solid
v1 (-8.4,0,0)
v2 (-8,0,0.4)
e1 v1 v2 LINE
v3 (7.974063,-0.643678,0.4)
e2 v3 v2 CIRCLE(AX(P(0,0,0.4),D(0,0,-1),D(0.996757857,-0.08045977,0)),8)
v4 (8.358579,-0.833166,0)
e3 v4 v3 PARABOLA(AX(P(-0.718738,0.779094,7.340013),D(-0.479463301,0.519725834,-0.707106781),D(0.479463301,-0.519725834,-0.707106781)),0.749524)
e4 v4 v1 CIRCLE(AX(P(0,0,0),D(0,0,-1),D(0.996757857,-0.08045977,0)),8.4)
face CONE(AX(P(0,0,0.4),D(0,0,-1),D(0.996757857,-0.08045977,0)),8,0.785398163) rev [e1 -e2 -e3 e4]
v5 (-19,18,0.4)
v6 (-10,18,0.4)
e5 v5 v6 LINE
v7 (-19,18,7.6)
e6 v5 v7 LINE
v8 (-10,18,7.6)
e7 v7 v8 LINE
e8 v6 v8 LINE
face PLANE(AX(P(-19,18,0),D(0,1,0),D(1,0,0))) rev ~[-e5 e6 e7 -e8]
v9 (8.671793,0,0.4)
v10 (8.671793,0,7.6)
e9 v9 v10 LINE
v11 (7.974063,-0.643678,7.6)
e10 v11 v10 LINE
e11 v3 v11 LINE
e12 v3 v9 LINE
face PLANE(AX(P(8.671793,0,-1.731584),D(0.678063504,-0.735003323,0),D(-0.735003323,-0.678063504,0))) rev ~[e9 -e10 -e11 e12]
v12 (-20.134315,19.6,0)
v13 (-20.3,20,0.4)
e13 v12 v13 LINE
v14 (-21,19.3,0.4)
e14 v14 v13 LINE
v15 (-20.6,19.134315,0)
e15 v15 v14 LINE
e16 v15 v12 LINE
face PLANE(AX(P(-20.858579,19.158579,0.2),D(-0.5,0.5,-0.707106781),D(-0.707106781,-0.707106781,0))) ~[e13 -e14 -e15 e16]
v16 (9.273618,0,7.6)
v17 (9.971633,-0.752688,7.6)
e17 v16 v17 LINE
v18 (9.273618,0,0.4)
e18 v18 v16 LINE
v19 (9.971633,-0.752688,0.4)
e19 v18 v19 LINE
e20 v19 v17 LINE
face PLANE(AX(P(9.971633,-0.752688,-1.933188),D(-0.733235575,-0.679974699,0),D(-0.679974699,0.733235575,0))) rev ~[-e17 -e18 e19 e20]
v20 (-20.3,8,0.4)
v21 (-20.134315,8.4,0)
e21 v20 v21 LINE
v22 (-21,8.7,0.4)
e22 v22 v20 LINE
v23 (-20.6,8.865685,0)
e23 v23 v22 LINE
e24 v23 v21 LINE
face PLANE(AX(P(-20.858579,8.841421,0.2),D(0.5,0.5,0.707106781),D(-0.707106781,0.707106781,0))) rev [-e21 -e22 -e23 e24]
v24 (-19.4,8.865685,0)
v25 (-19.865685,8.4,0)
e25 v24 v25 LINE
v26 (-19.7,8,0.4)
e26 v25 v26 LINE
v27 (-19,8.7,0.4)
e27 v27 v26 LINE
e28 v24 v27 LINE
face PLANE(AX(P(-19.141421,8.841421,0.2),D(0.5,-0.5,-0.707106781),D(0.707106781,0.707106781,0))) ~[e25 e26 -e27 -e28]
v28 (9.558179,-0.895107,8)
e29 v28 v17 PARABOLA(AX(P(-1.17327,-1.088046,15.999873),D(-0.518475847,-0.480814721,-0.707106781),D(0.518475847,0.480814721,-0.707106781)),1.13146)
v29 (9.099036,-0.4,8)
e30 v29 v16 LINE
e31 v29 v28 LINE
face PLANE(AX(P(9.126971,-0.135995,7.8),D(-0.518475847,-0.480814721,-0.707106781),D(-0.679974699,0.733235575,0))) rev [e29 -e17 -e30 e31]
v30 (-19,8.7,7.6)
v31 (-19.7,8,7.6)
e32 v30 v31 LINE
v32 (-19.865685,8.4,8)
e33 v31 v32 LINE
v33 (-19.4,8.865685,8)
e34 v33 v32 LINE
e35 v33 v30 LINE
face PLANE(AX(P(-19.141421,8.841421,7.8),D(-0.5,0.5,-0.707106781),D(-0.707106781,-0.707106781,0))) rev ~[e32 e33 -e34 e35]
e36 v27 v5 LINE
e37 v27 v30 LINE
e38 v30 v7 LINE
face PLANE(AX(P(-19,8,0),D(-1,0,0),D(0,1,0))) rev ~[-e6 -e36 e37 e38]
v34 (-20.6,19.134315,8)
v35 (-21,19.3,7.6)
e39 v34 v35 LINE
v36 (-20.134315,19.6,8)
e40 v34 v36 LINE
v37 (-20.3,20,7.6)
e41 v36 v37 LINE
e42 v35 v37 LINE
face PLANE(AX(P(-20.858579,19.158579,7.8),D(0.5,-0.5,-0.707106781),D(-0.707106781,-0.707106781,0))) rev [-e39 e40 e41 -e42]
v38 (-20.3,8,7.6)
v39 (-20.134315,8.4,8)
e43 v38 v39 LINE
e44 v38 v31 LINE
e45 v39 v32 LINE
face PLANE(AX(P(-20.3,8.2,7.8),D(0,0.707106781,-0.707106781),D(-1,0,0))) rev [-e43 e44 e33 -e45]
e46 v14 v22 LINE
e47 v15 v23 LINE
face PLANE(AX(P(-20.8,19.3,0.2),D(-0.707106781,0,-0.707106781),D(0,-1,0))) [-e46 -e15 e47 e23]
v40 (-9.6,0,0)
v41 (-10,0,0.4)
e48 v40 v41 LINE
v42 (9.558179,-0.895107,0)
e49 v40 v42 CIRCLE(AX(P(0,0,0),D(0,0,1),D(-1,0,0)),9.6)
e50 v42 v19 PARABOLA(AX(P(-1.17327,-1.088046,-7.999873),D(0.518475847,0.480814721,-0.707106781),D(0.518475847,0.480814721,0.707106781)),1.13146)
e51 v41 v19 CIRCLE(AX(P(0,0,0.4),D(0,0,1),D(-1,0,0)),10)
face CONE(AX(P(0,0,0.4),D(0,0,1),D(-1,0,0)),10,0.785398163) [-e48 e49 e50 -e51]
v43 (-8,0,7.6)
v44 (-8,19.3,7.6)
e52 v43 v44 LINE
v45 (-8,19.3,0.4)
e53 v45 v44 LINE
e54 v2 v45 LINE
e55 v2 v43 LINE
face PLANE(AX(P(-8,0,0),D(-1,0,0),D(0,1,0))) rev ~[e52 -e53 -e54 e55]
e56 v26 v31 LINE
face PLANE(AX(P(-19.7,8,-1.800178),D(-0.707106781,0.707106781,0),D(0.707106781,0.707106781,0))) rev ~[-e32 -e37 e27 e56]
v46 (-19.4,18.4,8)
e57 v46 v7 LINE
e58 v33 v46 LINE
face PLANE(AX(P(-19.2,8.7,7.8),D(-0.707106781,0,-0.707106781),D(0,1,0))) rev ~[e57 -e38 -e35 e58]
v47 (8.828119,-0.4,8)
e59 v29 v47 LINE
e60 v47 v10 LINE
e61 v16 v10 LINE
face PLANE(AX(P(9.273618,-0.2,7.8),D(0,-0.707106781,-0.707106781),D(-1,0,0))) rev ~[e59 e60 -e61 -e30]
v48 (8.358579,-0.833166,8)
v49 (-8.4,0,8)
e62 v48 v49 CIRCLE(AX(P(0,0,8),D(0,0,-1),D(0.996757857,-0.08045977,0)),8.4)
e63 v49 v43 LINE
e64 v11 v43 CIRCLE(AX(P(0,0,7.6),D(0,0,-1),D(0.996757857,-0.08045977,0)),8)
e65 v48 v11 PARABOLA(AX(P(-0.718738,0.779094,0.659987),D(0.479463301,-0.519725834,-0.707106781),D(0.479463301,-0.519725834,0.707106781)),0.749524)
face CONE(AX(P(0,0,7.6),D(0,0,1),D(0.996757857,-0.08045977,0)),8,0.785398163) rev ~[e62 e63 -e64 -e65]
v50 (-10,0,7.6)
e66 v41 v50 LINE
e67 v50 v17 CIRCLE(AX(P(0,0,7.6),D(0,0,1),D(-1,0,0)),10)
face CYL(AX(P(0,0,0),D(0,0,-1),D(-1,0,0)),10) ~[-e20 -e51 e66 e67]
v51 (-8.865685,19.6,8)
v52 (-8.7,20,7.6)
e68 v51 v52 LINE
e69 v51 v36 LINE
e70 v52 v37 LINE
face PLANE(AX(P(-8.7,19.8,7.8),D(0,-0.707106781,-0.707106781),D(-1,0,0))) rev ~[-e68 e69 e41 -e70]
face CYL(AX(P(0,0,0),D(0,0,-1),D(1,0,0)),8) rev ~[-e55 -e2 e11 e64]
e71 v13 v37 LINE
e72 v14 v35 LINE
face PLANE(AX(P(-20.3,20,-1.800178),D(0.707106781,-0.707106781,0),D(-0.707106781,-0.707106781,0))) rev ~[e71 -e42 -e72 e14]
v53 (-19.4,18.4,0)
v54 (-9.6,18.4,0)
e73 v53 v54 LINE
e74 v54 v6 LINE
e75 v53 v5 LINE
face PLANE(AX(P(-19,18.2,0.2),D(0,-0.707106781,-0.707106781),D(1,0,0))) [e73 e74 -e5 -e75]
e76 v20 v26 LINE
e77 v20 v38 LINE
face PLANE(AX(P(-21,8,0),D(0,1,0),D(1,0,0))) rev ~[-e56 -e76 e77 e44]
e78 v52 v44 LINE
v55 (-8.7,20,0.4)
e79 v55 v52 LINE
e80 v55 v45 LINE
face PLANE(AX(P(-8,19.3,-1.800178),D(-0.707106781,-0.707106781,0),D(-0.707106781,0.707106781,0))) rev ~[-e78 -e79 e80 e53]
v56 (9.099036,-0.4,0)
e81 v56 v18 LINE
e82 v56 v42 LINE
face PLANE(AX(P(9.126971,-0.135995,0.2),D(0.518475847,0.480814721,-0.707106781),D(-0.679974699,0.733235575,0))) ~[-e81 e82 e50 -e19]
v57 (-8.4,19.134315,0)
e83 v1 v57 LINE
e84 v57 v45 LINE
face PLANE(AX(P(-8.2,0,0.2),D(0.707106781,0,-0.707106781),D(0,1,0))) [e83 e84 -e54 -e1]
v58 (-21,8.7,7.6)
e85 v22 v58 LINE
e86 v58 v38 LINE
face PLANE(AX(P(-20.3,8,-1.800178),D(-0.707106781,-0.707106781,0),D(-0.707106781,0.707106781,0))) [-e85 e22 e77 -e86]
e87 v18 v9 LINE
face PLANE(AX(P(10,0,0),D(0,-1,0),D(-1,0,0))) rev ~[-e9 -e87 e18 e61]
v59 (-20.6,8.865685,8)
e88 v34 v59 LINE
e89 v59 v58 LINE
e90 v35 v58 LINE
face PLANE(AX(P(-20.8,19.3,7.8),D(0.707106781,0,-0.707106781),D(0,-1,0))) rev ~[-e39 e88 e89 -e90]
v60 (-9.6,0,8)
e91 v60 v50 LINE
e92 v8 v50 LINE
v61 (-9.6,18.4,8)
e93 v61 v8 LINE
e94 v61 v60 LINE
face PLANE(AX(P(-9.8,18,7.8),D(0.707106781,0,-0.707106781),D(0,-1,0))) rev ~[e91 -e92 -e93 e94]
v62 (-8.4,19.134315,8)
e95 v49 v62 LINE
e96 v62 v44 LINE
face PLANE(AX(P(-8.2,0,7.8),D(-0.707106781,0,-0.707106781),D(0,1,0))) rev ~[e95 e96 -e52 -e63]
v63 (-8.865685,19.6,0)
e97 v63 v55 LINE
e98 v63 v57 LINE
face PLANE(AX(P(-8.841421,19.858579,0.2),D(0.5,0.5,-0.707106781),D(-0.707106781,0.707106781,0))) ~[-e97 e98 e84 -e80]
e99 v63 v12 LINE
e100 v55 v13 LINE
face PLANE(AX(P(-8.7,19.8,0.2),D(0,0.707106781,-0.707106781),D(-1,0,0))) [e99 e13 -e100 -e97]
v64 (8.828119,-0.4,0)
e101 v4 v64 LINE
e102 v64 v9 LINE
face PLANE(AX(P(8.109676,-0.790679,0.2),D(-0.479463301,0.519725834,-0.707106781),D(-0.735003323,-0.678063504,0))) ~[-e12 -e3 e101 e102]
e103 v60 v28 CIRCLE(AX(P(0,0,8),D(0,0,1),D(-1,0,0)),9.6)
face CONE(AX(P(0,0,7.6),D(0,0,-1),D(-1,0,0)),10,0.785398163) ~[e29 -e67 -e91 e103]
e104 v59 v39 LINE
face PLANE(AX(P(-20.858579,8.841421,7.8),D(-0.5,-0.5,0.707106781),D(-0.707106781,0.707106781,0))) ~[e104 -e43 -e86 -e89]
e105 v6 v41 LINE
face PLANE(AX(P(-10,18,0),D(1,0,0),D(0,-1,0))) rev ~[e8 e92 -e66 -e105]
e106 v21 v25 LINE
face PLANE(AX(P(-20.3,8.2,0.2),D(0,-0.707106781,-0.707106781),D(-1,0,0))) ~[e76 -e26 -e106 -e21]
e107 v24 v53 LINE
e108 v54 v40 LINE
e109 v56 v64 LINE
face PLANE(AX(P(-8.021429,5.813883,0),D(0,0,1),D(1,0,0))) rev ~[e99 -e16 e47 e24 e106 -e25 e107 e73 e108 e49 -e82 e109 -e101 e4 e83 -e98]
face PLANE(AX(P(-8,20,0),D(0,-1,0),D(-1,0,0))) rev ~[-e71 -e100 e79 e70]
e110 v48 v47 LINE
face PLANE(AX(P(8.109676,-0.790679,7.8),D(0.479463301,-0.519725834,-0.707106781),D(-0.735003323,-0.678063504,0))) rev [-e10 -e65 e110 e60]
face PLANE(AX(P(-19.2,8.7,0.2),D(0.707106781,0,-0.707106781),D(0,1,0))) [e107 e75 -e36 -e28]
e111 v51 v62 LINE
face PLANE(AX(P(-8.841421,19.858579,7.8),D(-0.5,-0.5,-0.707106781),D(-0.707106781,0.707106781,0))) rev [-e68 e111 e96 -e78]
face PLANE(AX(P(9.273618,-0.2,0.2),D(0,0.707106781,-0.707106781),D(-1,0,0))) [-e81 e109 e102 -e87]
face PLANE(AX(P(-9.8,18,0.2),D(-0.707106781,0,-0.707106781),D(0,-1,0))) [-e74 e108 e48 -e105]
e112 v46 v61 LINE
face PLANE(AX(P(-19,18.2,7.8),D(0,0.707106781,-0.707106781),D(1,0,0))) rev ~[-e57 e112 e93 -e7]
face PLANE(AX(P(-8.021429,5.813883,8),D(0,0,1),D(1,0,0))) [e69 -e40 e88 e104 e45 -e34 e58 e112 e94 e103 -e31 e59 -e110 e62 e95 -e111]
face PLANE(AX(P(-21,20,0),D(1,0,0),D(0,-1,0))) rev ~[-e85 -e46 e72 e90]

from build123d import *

# Parameters (mm, degrees)
F1_DEPTH    = 8
F2_T1_DEPTH = 11.6003561832
F2_T3_DEPTH = 11.8663751546
F2_T5_DEPTH = 11.4631685347
F3_SIZE     = 0.4


# Not quite as in the source:
# - a fillet or chamfer that OpenCascade refuses, or shapes differently, is made with other operations: its cross-section is extruded or revolved along the edge and cut away or added


with BuildPart() as f1:
    # F0 (on Top) → F1 (new body)
    with BuildSketch(Plane.XY):
        with BuildLine():
            Line((-21, 8), (-19, 8))
            Line((-19, 8), (-19, 18))
            Line((-19, 18), (-10, 18))
            Line((-10, 18), (-10, 0))
            ThreePointArc((-10, 0), (0, -10), (10, 0))
            Line((10, 0), (8, 0))
            ThreePointArc((8, 0), (0, -8), (-8, 0))
            Line((-8, 0), (-8, 20))
            Line((-8, 20), (-21, 20))
            Line((-21, 20), (-21, 8))
        make_face()
    extrude(amount=F1_DEPTH)

    # F2: chamfer of 0.7 on 6 edges, made by hand

    # F2_s2 → F2_t1 (cut)
    with BuildSketch(Plane.XY.offset(-1.8001780916)):
        Polygon((-8, 19.3), (-8.7, 20), (-8, 20), align=None)
        Polygon((-20.3, 20), (-21, 19.3), (-21, 20), align=None)
        Polygon((-20.3, 8), (-21, 8.7), (-21, 8), align=None)
        Polygon((-19.7, 8), (-19, 8.7), (-19, 8), align=None)
    extrude(amount=F2_T1_DEPTH, mode=Mode.SUBTRACT)

    # F2_s4 → F2_t3 (cut)
    with BuildSketch(Plane.XY.offset(-1.9331875773)):
        with BuildLine():
            Line((9.9716327909, -0.752688172), (9.2736184955, 0))
            Line((9.2736184955, 0), (10, 0))
            ThreePointArc((10, 0), (9.9925280661, -0.3865007745), (9.9716327909, -0.752688172))
        make_face()
    extrude(amount=F2_T3_DEPTH, mode=Mode.SUBTRACT)

    # F2_s6 → F2_t5 (cut)
    with BuildSketch(Plane.XY.offset(-1.7315842673)):
        with BuildLine():
            Line((8.6717933555, 0), (7.9740628556, -0.6436781609))
            ThreePointArc((7.9740628556, -0.6436781609), (7.9931075422, -0.332011775), (8, 0))
            Line((8, 0), (8.6717933555, 0))
        make_face()
    extrude(amount=F2_T5_DEPTH, mode=Mode.SUBTRACT)

    # F3
    f3_edges = [f1.edges().sort_by_distance(p)[0] for p in [
        (-20.65, 19.65, 8),
        (-14.5, 20, 8),
        (-8.35, 19.65, 8),
        (-8, 9.65, 8),
        (-0.3221, -7.993513, 8),
        (8.322928, -0.321839, 8),
        (8.972706, 0, 8),
        (9.622626, -0.376344, 8),
        (-0.376611, -9.992906, 8),
        (-10, 9, 8),
        (-14.5, 18, 8),
        (-19, 13.35, 8),
        (-19.35, 8.35, 8),
        (-20, 8, 8),
        (-20.65, 8.35, 8),
        (-21, 14, 8),
        (-20.65, 19.65, 0),
        (-14.5, 20, 0),
        (-8.35, 19.65, 0),
        (-8, 9.65, 0),
        (-0.3221, -7.993513, 0),
        (8.322928, -0.321839, 0),
        (8.972706, 0, 0),
        (9.622626, -0.376344, 0),
        (-0.376611, -9.992906, 0),
        (-10, 9, 0),
        (-14.5, 18, 0),
        (-19, 13.35, 0),
        (-19.35, 8.35, 0),
        (-20, 8, 0),
        (-20.65, 8.35, 0),
        (-21, 14, 0),
    ]]
    chamfer(f3_edges, length=F3_SIZE)


solid = f1.part
